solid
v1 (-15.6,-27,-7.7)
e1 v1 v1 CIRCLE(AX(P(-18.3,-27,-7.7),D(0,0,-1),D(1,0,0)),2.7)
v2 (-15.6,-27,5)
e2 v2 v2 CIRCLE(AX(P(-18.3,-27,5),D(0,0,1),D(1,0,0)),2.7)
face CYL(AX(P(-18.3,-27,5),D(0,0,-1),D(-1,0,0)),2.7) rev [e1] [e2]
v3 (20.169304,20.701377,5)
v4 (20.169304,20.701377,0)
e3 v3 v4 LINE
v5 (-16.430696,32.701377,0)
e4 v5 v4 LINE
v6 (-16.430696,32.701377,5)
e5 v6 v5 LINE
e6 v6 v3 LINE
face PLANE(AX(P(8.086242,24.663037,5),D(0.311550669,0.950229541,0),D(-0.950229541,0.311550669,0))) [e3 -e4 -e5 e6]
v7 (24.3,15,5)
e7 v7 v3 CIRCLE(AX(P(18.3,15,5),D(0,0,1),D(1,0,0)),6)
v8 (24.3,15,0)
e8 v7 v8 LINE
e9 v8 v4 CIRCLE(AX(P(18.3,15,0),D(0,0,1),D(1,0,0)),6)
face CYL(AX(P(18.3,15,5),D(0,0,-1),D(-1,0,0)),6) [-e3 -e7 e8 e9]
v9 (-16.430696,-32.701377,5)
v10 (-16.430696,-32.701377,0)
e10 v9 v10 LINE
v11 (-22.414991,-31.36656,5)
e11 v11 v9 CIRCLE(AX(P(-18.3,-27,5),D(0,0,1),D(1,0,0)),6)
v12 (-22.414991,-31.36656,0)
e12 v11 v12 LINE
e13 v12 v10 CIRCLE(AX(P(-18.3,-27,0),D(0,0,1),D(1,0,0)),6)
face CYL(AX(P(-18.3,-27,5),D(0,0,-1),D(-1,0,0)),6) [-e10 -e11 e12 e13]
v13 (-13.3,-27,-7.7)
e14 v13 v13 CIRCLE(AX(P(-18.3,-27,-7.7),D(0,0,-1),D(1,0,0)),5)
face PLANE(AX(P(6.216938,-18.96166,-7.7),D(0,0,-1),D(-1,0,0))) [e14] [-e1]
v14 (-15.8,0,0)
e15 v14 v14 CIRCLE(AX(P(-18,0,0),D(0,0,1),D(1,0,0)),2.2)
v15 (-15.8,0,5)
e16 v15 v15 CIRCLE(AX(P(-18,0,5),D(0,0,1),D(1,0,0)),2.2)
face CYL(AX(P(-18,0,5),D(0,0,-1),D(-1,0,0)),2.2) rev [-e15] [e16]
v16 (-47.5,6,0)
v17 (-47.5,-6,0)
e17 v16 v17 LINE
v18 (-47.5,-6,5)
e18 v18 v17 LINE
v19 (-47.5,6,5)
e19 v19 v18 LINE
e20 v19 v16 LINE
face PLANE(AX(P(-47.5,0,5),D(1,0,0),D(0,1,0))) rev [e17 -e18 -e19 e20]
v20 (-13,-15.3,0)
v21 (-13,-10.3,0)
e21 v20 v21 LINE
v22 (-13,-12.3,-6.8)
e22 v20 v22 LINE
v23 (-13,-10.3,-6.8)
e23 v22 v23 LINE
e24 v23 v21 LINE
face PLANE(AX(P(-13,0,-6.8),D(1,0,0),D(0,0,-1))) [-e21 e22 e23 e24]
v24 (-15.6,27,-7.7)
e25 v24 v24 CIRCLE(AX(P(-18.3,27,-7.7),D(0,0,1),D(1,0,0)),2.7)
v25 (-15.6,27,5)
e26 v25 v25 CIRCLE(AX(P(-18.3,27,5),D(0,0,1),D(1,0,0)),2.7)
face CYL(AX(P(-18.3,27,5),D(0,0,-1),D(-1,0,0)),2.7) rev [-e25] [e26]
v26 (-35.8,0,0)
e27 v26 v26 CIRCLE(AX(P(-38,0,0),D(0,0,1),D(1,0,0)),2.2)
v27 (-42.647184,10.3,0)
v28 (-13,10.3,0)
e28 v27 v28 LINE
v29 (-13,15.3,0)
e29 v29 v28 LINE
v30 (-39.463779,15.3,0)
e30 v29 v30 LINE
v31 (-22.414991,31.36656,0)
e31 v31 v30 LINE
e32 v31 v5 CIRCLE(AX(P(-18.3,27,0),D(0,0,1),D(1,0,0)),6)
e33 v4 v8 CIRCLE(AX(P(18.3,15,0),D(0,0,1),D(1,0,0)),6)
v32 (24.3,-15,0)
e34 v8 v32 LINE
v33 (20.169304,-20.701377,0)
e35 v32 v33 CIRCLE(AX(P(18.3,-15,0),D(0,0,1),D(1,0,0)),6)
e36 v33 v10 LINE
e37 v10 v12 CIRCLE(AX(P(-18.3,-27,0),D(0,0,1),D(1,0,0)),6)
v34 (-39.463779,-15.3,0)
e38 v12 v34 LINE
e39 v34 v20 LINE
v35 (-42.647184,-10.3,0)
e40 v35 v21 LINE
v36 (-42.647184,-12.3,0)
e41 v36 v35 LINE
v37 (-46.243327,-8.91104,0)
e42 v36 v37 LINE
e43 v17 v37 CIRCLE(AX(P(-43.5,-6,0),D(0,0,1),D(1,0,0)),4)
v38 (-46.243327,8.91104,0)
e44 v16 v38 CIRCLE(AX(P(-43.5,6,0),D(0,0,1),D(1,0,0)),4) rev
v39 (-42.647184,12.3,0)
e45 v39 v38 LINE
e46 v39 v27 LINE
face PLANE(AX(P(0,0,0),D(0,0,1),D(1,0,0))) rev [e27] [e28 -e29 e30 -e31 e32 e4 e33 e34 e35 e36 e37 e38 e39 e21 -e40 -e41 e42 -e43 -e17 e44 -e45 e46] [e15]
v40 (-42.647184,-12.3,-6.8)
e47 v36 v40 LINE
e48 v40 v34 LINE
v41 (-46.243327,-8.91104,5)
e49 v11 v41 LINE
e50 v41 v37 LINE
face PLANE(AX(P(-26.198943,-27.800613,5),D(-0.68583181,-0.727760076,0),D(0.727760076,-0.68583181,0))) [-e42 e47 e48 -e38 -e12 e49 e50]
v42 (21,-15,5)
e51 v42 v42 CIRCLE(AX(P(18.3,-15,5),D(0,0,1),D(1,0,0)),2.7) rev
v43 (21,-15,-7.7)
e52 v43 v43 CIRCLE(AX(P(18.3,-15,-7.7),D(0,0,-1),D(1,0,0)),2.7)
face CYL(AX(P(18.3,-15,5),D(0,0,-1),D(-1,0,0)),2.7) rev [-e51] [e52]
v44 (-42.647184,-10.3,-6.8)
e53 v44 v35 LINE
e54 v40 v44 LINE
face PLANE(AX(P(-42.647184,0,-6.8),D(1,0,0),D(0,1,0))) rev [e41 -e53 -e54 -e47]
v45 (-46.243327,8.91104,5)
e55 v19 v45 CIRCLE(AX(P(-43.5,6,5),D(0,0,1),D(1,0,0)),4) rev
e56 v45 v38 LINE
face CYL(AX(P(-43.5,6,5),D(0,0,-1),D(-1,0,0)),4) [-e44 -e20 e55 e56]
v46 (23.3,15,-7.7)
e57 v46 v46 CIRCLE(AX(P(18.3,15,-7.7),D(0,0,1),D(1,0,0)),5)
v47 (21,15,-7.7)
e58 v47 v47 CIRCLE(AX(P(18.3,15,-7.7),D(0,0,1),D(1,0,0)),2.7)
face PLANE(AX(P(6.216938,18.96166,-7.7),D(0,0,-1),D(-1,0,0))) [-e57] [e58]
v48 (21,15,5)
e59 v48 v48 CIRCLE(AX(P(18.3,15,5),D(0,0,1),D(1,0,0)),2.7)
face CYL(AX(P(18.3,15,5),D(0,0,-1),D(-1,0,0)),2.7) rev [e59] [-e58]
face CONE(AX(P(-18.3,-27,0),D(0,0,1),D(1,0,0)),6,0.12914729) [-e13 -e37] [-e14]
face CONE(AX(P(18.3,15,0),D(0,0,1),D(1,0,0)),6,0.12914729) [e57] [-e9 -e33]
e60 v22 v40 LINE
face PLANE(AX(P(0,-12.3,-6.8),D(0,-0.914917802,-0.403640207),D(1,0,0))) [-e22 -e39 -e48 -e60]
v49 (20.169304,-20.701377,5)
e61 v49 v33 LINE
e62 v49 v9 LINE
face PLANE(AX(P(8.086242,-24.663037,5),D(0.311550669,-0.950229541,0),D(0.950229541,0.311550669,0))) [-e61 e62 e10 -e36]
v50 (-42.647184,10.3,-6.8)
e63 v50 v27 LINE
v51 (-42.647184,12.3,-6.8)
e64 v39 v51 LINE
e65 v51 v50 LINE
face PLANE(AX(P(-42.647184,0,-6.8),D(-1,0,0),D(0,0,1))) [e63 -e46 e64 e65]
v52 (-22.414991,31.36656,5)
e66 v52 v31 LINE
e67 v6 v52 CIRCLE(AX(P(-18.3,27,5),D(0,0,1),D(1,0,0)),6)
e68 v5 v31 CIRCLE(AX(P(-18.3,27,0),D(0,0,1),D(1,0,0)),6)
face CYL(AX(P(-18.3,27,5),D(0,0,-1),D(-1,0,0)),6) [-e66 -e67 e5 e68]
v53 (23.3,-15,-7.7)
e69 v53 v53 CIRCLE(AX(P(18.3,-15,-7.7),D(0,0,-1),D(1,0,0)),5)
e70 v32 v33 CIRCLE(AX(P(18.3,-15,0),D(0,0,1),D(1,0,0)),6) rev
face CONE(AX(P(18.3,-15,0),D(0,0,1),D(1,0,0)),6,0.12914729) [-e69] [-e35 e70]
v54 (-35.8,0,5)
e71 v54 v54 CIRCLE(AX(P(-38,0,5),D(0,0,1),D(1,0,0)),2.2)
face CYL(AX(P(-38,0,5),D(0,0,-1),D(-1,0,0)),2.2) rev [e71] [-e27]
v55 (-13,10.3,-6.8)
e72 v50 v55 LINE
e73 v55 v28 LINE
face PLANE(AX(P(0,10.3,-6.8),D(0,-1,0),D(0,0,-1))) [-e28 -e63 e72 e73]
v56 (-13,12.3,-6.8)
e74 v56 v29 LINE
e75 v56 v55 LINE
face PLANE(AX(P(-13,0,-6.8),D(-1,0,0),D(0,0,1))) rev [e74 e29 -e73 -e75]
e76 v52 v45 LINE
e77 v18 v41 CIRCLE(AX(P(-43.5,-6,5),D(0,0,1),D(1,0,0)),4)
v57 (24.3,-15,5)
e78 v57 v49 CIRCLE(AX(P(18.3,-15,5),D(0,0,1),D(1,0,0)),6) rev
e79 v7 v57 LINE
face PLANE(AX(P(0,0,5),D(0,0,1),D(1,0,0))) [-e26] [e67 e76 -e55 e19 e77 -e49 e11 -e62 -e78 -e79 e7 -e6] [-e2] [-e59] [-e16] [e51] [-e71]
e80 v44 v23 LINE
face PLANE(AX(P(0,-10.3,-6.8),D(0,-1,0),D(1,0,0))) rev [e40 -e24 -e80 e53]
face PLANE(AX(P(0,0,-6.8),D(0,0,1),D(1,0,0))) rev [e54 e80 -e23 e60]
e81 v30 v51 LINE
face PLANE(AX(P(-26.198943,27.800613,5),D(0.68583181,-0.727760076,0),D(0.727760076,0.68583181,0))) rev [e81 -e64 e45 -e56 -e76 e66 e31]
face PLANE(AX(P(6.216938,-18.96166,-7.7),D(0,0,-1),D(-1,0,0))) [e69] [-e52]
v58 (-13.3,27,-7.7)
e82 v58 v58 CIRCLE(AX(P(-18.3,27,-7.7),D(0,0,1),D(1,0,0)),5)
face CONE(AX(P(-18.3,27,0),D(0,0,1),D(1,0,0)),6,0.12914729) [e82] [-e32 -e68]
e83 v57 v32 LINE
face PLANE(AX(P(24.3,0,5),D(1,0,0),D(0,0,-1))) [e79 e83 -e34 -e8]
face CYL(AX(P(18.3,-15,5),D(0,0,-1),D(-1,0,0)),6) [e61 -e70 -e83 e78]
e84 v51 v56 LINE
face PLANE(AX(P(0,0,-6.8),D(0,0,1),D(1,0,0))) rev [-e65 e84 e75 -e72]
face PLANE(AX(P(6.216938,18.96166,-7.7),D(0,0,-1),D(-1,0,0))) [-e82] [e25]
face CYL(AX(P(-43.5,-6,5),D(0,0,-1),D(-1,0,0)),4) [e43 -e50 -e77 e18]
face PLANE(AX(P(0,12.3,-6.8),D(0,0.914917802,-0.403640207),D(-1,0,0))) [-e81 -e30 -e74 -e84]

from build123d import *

# Parameters (mm, degrees)
SKETCH_1_R       = 2.7
SKETCH_1_R_2     = 2.2
EXTRUDE_1_DEPTH  = 5
SKETCH_1_4_W     = 29.647183795
SKETCH_1_4_H     = 2
EXTRUDE_2_DEPTH  = 6.8
CHAMFER_1_SIZE   = 3
CHAMFER_1_SIZE_2 = 6.8
CHAMFER_2_SIZE   = 3
CHAMFER_2_SIZE_2 = 6.8


with BuildPart() as part:
    # 草图1 → 凸台-拉伸1 (new body)
    with BuildSketch(Plane.XY):
        with BuildLine():
            Line((-22.414990858, 31.366560458), (-46.243327239, 8.911040306))
            ThreePointArc((-46.243327239, 8.911040306), (-47.17241807, 7.585353438), (-47.5, 6))
            Line((-47.5, 6), (-47.5, -6))
            ThreePointArc((-47.5, -6), (-47.17241807, -7.585353438), (-46.243327239, -8.911040306))
            Line((-46.243327239, -8.911040306), (-22.414990858, -31.366560458))
            ThreePointArc((-22.414990858, -31.366560458), (-19.606220239, -32.85608988), (-16.430695985, -32.701377246))
            Line((-16.430695985, -32.701377246), (20.169304015, -20.701377246))
            ThreePointArc((20.169304015, -20.701377246), (23.158797387, -18.520239758), (24.3, -15))
            Line((24.3, -15), (24.3, 15))
            ThreePointArc((24.3, 15), (23.158797387, 18.520239758), (20.169304015, 20.701377246))
            Line((20.169304015, 20.701377246), (-16.430695985, 32.701377246))
            ThreePointArc((-16.430695985, 32.701377246), (-19.606220239, 32.85608988), (-22.414990858, 31.366560458))
        make_face()
        with Locations((18.3, -15)):
            Circle(SKETCH_1_R, mode=Mode.SUBTRACT)
        with Locations((-38, 0)):
            Circle(SKETCH_1_R_2, mode=Mode.SUBTRACT)
        with Locations((-18, 0)):
            Circle(SKETCH_1_R_2, mode=Mode.SUBTRACT)
        with Locations((-18.3, 27)):
            Circle(SKETCH_1_R, mode=Mode.SUBTRACT)
        with Locations((18.3, 15)):
            Circle(SKETCH_1_R, mode=Mode.SUBTRACT)
        with Locations((-18.3, -27)):
            Circle(SKETCH_1_R, mode=Mode.SUBTRACT)
    extrude(amount=EXTRUDE_1_DEPTH)

    # 草图4 → 旋转1 (revolve)
    with BuildSketch(Plane(origin=(6.216937636, 18.961659791, 0), x_dir=(-0.9502295409734977, 0.31155066917163887, 0), z_dir=(-0.31155066917163887, -0.9502295409734977, 0)), mode=Mode.PRIVATE) as revolve_1_sk:
        Polygon((-6.715940562, 0), (-7.715940562, 7.7), (-10.015940562, 7.7), (-10.015940562, 0), align=None)
    revolve_1 = revolve(revolve_1_sk.sketch.rotate(Axis((18.3, 15, 4.45283877), (0, 0, -1)), 161.847294113), axis=Axis((18.3, 15, 4.45283877), (0, 0, -1)))

    # 草图4<3> → 旋转2 (revolve)
    with BuildSketch(Plane(origin=(6.216937636, 18.961659791, 0), x_dir=(-0.9502295409734977, 0.31155066917163887, 0), z_dir=(-0.31155066917163887, -0.9502295409734977, 0)), mode=Mode.PRIVATE) as revolve_2_sk:
        Polygon((30.801068667, 7.7), (28.501068667, 7.7), (28.501068667, 0), (31.801068667, 0), align=None)
    revolve_2 = revolve(revolve_2_sk.sketch.rotate(Axis((-18.3, 27, 0), (0, 0, -1)), 161.847294113), axis=Axis((-18.3, 27, 0), (0, 0, -1)))

    # 镜向1: 旋转1, 旋转2 across plane
    add(revolve_1.mirror(Plane.ZX))
    add(revolve_2.mirror(Plane.ZX))

    # 草图1<4> → 凸台-拉伸2 (add)
    with BuildSketch(Plane.XY):
        with Locations((-27.823591898, 11.3)):
            Rectangle(SKETCH_1_4_W, SKETCH_1_4_H)
        with Locations((-27.823591898, -11.3)):
            Rectangle(SKETCH_1_4_W, SKETCH_1_4_H)
    extrude(amount=-EXTRUDE_2_DEPTH)

    # 倒角1
    # the kernel refuses this chamfer: 6.8, 3 mm, written as the material it adds along each edge
    with BuildSketch(Plane(origin=(-13, 12.3, 0), x_dir=(0, 0.9968133817371192, 0.07976892872421078), z_dir=(-1, 0, 0))) as chamfer_1_piece_1_section:
        Polygon((CHAMFER_1_SIZE * 0.996813381737, CHAMFER_1_SIZE * 0.0797689287242), (-CHAMFER_1_SIZE_2 * 0.0797689287242, CHAMFER_1_SIZE_2 * 0.996813381737), (0, 0), align=None)
    chamfer_1_piece_1 = extrude(amount=29.647183795, mode=Mode.PRIVATE)
    chamfer_1_piece_1 = split(chamfer_1_piece_1, bisect_by=Plane(origin=(-34.073753533, 20.379491281, -2.31410284), z_dir=(0.685831809699718, -0.7277600764015637, 0)), keep=Keep.TOP, mode=Mode.PRIVATE)
    chamfer_1_piece_1 = split(chamfer_1_piece_1, bisect_by=Plane(origin=(-27.32988888, 13.223341061, -6.8), z_dir=(0, 0, 1)), keep=Keep.TOP, mode=Mode.PRIVATE)
    add(chamfer_1_piece_1)

    # 倒角2
    # the kernel refuses this chamfer: 6.8, 3 mm, written as the material it adds along each edge
    with BuildSketch(Plane(origin=(-42.647183795, -12.3, 0), x_dir=(0, -0.9968133817371192, 0.07976892872421078), z_dir=(1, 0, 0))) as chamfer_2_piece_1_section:
        Polygon((CHAMFER_2_SIZE * 0.996813381737, CHAMFER_2_SIZE * 0.0797689287242), (-CHAMFER_2_SIZE_2 * 0.0797689287242, CHAMFER_2_SIZE_2 * 0.996813381737), (0, 0), align=None)
    chamfer_2_piece_1 = extrude(amount=29.647183795, mode=Mode.PRIVATE)
    chamfer_2_piece_1 = split(chamfer_2_piece_1, bisect_by=Plane(origin=(-34.073753533, -20.379491281, -2.31410284), z_dir=(0.6858318096997175, 0.7277600764015641, 0)), keep=Keep.TOP, mode=Mode.PRIVATE)
    chamfer_2_piece_1 = split(chamfer_2_piece_1, bisect_by=Plane(origin=(-27.32988888, -13.223341061, -6.8), z_dir=(0, 0, 1)), keep=Keep.TOP, mode=Mode.PRIVATE)
    add(chamfer_2_piece_1)


solid = part.part
